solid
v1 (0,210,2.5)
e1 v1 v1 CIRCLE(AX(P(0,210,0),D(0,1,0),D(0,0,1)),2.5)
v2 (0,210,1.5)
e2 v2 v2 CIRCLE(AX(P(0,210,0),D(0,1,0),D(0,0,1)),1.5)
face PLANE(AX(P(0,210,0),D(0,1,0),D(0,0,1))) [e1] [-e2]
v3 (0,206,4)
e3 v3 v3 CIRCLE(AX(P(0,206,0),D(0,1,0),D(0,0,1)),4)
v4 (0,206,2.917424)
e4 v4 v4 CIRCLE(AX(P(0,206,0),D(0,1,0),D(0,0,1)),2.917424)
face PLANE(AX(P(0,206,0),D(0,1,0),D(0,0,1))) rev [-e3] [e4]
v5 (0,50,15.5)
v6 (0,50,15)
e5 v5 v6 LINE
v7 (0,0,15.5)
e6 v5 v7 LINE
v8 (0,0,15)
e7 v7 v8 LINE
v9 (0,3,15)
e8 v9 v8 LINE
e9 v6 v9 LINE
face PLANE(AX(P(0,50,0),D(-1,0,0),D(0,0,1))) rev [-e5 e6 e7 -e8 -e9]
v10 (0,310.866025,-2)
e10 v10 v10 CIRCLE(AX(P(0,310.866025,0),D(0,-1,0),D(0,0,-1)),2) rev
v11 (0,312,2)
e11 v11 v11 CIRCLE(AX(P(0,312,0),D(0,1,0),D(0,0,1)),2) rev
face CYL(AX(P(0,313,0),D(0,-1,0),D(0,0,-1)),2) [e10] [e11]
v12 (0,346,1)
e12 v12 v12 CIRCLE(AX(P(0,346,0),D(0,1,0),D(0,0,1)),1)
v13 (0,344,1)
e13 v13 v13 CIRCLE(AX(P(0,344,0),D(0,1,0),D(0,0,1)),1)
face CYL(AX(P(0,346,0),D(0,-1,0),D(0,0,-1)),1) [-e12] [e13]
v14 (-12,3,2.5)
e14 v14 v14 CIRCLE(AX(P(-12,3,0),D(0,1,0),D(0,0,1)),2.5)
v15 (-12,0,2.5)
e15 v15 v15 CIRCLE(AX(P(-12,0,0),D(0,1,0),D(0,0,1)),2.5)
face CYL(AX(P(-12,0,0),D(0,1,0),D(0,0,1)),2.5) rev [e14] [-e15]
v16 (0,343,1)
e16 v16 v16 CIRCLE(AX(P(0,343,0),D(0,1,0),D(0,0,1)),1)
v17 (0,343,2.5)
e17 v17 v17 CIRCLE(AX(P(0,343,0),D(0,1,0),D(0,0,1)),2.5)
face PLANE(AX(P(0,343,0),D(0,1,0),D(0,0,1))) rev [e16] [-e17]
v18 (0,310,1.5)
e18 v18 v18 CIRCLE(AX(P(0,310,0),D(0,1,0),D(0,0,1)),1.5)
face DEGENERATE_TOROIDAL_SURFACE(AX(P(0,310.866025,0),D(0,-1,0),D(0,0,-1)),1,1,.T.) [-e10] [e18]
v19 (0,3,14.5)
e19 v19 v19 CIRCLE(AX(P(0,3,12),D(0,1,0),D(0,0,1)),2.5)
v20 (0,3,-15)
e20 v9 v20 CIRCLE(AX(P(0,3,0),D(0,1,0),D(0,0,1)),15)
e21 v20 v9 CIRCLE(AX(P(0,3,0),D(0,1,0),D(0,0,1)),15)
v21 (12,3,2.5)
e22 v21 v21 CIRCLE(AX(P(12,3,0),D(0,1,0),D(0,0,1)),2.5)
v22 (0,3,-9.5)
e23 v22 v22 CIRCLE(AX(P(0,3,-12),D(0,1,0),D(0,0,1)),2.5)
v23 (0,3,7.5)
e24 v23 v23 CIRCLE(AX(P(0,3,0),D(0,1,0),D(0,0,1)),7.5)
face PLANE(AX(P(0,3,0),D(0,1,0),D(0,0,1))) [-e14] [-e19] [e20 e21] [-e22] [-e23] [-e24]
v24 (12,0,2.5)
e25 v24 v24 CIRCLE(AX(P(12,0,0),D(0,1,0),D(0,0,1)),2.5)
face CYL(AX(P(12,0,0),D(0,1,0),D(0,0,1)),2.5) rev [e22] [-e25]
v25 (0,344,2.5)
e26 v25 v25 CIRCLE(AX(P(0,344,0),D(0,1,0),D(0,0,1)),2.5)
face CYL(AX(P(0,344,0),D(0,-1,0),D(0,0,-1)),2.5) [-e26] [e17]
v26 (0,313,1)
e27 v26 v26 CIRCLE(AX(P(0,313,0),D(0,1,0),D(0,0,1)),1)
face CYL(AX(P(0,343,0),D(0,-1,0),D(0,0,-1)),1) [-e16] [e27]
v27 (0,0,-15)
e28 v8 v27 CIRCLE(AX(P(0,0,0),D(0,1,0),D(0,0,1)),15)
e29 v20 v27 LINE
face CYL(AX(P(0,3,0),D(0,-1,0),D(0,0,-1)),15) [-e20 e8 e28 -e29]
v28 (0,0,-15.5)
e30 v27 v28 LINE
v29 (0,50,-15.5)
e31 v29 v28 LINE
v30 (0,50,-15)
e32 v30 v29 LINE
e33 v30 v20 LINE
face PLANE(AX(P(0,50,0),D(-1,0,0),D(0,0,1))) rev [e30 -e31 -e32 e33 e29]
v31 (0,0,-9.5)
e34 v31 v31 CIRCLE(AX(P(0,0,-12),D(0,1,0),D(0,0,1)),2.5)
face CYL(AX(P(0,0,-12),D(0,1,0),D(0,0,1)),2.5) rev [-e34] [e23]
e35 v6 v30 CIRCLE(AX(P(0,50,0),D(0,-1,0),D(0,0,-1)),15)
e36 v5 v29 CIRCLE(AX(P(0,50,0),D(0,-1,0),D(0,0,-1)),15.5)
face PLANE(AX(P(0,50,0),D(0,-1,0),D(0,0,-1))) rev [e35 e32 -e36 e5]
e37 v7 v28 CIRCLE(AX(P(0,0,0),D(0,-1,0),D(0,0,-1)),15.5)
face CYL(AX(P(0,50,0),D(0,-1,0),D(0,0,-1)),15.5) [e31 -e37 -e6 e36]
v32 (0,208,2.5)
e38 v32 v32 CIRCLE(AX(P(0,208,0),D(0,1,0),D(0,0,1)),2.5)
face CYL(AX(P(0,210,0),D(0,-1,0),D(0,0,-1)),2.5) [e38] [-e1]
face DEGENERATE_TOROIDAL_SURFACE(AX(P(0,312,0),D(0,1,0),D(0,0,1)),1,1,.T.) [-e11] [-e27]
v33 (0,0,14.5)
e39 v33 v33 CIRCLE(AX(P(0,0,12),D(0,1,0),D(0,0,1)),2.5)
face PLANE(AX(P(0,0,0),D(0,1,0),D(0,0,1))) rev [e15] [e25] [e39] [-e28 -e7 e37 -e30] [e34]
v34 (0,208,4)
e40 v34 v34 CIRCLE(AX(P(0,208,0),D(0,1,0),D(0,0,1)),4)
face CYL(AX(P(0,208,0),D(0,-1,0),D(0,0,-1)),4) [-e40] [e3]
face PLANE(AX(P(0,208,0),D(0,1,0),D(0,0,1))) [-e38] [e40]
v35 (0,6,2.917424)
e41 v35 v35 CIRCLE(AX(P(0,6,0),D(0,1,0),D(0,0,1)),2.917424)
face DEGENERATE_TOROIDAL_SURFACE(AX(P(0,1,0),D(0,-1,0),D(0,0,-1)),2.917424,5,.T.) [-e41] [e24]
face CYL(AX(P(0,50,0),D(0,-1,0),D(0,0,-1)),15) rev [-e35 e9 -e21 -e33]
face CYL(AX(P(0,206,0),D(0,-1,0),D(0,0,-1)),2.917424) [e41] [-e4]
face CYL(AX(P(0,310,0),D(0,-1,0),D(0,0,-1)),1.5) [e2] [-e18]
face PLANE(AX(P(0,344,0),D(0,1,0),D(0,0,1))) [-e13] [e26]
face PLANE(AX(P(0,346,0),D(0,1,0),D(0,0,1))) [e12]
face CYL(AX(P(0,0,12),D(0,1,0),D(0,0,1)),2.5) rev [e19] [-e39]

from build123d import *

# Parameters (mm, degrees)
SKETCH1_R            = 15
BOSS_EXTRUDE1_DEPTH  = 3
SKETCH2_R            = 2.5
CUT_EXTRUDE1_DEPTH   = 3
SKETCH3_R            = 7.5
BOSS_EXTRUDE3_DEPTH  = 3
FILLET1_R            = 5
SKETCH4_R            = 2.917424305
BOSS_EXTRUDE4_DEPTH  = 200
SKETCH5_R            = 4
BOSS_EXTRUDE5_DEPTH  = 2
SKETCH6_R            = 2.5
BOSS_EXTRUDE6_DEPTH  = 2
SKETCH7_R            = 1.5
BOSS_EXTRUDE7_DEPTH  = 100
SKETCH8_R            = 2
BOSS_EXTRUDE9_DEPTH  = 3
FILLET4_R            = 1
SKETCH9_R            = 1
BOSS_EXTRUDE10_DEPTH = 30
SKETCH10_R           = 2.5
BOSS_EXTRUDE11_DEPTH = 1
SKETCH11_R           = 1
BOSS_EXTRUDE12_DEPTH = 2
BOSS_EXTRUDE13_DEPTH = 50


with BuildPart() as part:
    # Sketch1 → Boss-Extrude1 (new body)
    with BuildSketch(Plane(origin=(0, 0, 0), x_dir=(1, 0, 0), z_dir=(0, 1, 0))):
        with Locations(Location((0, 0, 0), (0, 0, 270))):
            Circle(SKETCH1_R)
    extrude(amount=BOSS_EXTRUDE1_DEPTH)

    # Sketch2 → Cut-Extrude1 (cut)
    with BuildSketch(Plane(origin=(0, 3, 0), x_dir=(1, 0, 0), z_dir=(0, 1, 0))):
        with Locations(Location((0, 12, 0), (0, 0, 270))):
            Circle(SKETCH2_R)
        with Locations(Location((12, 0, 0), (0, 0, 270))):
            Circle(SKETCH2_R)
        with Locations(Location((0, -12, 0), (0, 0, 270))):
            Circle(SKETCH2_R)
        with Locations(Location((-12, 0, 0), (0, 0, 270))):
            Circle(SKETCH2_R)
    extrude(amount=-CUT_EXTRUDE1_DEPTH, mode=Mode.SUBTRACT)

    # Sketch3 → Boss-Extrude3 (add)
    with BuildSketch(Plane(origin=(0, 3, 0), x_dir=(1, 0, 0), z_dir=(0, 1, 0))):
        with Locations(Location((0, 0, 0), (0, 0, 270))):
            Circle(SKETCH3_R)
    extrude(amount=BOSS_EXTRUDE3_DEPTH)

    # Fillet1
    # the kernel refuses this fillet: 5 mm, written as the material it takes off along each edge
    with BuildSketch(Plane(origin=(0, 6, 0), x_dir=(0, 0, 1), z_dir=(-1, 0, 0))) as fillet1_piece_1:
        with BuildLine():
            CenterArc((2.917424305, -5), FILLET1_R, 23.578178478, 66.421821522)
            Line((2.917424305, 0), (2.917424305, 0.1))
            Line((2.917424305, 0.1), (7.5, 0.1))
            Line((7.5, 0.1), (7.6, 0))
            ThreePointArc((7.6, 0), (7.6, -1.5), (7.591651514, -2.96))
            Line((7.591651514, -2.96), (7.5, -3))
        make_face()
    revolve(axis=Axis((0, 6, 0), (0, 1, 0)), mode=Mode.SUBTRACT)

    # Sketch4 → Boss-Extrude4 (add)
    with BuildSketch(Plane(origin=(0, 6, 0), x_dir=(1, 0, 0), z_dir=(0, 1, 0))):
        with Locations(Location((0, 0, 0), (0, 0, 270))):
            Circle(SKETCH4_R)
    extrude(amount=BOSS_EXTRUDE4_DEPTH)

    # Sketch5 → Boss-Extrude5 (add)
    with BuildSketch(Plane(origin=(0, 206, 0), x_dir=(1, 0, 0), z_dir=(0, 1, 0))):
        with Locations(Location((0, 0, 0), (0, 0, 270))):
            Circle(SKETCH5_R)
    extrude(amount=BOSS_EXTRUDE5_DEPTH)

    # Sketch6 → Boss-Extrude6 (add)
    with BuildSketch(Plane(origin=(0, 208, 0), x_dir=(1, 0, 0), z_dir=(0, 1, 0))):
        with Locations(Location((0, 0, 0), (0, 0, 270))):
            Circle(SKETCH6_R)
    extrude(amount=BOSS_EXTRUDE6_DEPTH)

    # Sketch7 → Boss-Extrude7 (add)
    with BuildSketch(Plane(origin=(0, 210, 0), x_dir=(1, 0, 0), z_dir=(0, 1, 0))):
        with Locations(Location((0, 0, 0), (0, 0, 270))):
            Circle(SKETCH7_R)
    extrude(amount=BOSS_EXTRUDE7_DEPTH)

    # Sketch8 → Boss-Extrude9 (add)
    with BuildSketch(Plane(origin=(0, 310, 0), x_dir=(1, 0, 0), z_dir=(0, 1, 0))):
        with Locations(Location((0, 0, 0), (0, 0, 270))):
            Circle(SKETCH8_R)
    extrude(amount=BOSS_EXTRUDE9_DEPTH)

    # Fillet4
    # the kernel refuses this fillet: 1 mm, written as the material it takes off along each edge
    with BuildSketch(Plane(origin=(0, 310, 0), x_dir=(0, 0, 1), z_dir=(-1, 0, 0))) as fillet4_piece_1:
        with BuildLine():
            CenterArc((1, 0.866025404), FILLET4_R, 300, 60)
            Line((1.5, 0), (1.51, -0.017320508))
            ThreePointArc((1.51, -0.017320508), (1.75, -0.02), (2, -0.02))
            Line((2, -0.02), (2.02, 0))
            Line((2.02, 0), (2.02, 0.866025404))
            Line((2.02, 0.866025404), (2, 0.866025404))
        make_face()
    revolve(axis=Axis((0, 310, 0), (0, 1, 0)), mode=Mode.SUBTRACT)
    with BuildSketch(Plane(origin=(0, 313, 0), x_dir=(0, 0, 1), z_dir=(-1, 0, 0))) as fillet4_piece_2:
        with BuildLine():
            CenterArc((2 - FILLET4_R, -FILLET4_R), FILLET4_R, 0, 90)
            Line((2 - FILLET4_R, 0), (2 - FILLET4_R, FILLET4_R * 0.02))
            Line((2 - FILLET4_R, FILLET4_R * 0.02), (2 + FILLET4_R * 0.02, FILLET4_R * 0.02))
            Line((2 + FILLET4_R * 0.02, FILLET4_R * 0.02), (2 + FILLET4_R * 0.02, -FILLET4_R))
            Line((2 + FILLET4_R * 0.02, -FILLET4_R), (2, -FILLET4_R))
        make_face()
    revolve(axis=Axis((0, 313, 0), (0, 1, 0)), mode=Mode.SUBTRACT)

    # Sketch9 → Boss-Extrude10 (add)
    with BuildSketch(Plane(origin=(0, 313, 0), x_dir=(1, 0, 0), z_dir=(0, 1, 0))):
        with Locations(Location((0, 0, 0), (0, 0, 270))):
            Circle(SKETCH9_R)
    extrude(amount=BOSS_EXTRUDE10_DEPTH)

    # Sketch10 → Boss-Extrude11 (add)
    with BuildSketch(Plane(origin=(0, 343, 0), x_dir=(1, 0, 0), z_dir=(0, 1, 0))):
        with Locations(Location((0, 0, 0), (0, 0, 270))):
            Circle(SKETCH10_R)
    extrude(amount=BOSS_EXTRUDE11_DEPTH)

    # Sketch11 → Boss-Extrude12 (add)
    with BuildSketch(Plane(origin=(0, 344, 0), x_dir=(1, 0, 0), z_dir=(0, 1, 0))):
        with Locations(Location((0, 0, 0), (0, 0, 270))):
            Circle(SKETCH11_R)
    extrude(amount=BOSS_EXTRUDE12_DEPTH)

    # Sketch12 → Boss-Extrude13 (add)
    with BuildSketch(Plane.XZ):
        with BuildLine():
            Line((0, 15), (0, 15.5))
            ThreePointArc((0, 15.5), (-15.5, 0), (0, -15.5))
            Line((0, -15.5), (0, -15))
            ThreePointArc((0, -15), (-15, 0), (0, 15))
        make_face()
    extrude(amount=-BOSS_EXTRUDE13_DEPTH)


solid = part.part
